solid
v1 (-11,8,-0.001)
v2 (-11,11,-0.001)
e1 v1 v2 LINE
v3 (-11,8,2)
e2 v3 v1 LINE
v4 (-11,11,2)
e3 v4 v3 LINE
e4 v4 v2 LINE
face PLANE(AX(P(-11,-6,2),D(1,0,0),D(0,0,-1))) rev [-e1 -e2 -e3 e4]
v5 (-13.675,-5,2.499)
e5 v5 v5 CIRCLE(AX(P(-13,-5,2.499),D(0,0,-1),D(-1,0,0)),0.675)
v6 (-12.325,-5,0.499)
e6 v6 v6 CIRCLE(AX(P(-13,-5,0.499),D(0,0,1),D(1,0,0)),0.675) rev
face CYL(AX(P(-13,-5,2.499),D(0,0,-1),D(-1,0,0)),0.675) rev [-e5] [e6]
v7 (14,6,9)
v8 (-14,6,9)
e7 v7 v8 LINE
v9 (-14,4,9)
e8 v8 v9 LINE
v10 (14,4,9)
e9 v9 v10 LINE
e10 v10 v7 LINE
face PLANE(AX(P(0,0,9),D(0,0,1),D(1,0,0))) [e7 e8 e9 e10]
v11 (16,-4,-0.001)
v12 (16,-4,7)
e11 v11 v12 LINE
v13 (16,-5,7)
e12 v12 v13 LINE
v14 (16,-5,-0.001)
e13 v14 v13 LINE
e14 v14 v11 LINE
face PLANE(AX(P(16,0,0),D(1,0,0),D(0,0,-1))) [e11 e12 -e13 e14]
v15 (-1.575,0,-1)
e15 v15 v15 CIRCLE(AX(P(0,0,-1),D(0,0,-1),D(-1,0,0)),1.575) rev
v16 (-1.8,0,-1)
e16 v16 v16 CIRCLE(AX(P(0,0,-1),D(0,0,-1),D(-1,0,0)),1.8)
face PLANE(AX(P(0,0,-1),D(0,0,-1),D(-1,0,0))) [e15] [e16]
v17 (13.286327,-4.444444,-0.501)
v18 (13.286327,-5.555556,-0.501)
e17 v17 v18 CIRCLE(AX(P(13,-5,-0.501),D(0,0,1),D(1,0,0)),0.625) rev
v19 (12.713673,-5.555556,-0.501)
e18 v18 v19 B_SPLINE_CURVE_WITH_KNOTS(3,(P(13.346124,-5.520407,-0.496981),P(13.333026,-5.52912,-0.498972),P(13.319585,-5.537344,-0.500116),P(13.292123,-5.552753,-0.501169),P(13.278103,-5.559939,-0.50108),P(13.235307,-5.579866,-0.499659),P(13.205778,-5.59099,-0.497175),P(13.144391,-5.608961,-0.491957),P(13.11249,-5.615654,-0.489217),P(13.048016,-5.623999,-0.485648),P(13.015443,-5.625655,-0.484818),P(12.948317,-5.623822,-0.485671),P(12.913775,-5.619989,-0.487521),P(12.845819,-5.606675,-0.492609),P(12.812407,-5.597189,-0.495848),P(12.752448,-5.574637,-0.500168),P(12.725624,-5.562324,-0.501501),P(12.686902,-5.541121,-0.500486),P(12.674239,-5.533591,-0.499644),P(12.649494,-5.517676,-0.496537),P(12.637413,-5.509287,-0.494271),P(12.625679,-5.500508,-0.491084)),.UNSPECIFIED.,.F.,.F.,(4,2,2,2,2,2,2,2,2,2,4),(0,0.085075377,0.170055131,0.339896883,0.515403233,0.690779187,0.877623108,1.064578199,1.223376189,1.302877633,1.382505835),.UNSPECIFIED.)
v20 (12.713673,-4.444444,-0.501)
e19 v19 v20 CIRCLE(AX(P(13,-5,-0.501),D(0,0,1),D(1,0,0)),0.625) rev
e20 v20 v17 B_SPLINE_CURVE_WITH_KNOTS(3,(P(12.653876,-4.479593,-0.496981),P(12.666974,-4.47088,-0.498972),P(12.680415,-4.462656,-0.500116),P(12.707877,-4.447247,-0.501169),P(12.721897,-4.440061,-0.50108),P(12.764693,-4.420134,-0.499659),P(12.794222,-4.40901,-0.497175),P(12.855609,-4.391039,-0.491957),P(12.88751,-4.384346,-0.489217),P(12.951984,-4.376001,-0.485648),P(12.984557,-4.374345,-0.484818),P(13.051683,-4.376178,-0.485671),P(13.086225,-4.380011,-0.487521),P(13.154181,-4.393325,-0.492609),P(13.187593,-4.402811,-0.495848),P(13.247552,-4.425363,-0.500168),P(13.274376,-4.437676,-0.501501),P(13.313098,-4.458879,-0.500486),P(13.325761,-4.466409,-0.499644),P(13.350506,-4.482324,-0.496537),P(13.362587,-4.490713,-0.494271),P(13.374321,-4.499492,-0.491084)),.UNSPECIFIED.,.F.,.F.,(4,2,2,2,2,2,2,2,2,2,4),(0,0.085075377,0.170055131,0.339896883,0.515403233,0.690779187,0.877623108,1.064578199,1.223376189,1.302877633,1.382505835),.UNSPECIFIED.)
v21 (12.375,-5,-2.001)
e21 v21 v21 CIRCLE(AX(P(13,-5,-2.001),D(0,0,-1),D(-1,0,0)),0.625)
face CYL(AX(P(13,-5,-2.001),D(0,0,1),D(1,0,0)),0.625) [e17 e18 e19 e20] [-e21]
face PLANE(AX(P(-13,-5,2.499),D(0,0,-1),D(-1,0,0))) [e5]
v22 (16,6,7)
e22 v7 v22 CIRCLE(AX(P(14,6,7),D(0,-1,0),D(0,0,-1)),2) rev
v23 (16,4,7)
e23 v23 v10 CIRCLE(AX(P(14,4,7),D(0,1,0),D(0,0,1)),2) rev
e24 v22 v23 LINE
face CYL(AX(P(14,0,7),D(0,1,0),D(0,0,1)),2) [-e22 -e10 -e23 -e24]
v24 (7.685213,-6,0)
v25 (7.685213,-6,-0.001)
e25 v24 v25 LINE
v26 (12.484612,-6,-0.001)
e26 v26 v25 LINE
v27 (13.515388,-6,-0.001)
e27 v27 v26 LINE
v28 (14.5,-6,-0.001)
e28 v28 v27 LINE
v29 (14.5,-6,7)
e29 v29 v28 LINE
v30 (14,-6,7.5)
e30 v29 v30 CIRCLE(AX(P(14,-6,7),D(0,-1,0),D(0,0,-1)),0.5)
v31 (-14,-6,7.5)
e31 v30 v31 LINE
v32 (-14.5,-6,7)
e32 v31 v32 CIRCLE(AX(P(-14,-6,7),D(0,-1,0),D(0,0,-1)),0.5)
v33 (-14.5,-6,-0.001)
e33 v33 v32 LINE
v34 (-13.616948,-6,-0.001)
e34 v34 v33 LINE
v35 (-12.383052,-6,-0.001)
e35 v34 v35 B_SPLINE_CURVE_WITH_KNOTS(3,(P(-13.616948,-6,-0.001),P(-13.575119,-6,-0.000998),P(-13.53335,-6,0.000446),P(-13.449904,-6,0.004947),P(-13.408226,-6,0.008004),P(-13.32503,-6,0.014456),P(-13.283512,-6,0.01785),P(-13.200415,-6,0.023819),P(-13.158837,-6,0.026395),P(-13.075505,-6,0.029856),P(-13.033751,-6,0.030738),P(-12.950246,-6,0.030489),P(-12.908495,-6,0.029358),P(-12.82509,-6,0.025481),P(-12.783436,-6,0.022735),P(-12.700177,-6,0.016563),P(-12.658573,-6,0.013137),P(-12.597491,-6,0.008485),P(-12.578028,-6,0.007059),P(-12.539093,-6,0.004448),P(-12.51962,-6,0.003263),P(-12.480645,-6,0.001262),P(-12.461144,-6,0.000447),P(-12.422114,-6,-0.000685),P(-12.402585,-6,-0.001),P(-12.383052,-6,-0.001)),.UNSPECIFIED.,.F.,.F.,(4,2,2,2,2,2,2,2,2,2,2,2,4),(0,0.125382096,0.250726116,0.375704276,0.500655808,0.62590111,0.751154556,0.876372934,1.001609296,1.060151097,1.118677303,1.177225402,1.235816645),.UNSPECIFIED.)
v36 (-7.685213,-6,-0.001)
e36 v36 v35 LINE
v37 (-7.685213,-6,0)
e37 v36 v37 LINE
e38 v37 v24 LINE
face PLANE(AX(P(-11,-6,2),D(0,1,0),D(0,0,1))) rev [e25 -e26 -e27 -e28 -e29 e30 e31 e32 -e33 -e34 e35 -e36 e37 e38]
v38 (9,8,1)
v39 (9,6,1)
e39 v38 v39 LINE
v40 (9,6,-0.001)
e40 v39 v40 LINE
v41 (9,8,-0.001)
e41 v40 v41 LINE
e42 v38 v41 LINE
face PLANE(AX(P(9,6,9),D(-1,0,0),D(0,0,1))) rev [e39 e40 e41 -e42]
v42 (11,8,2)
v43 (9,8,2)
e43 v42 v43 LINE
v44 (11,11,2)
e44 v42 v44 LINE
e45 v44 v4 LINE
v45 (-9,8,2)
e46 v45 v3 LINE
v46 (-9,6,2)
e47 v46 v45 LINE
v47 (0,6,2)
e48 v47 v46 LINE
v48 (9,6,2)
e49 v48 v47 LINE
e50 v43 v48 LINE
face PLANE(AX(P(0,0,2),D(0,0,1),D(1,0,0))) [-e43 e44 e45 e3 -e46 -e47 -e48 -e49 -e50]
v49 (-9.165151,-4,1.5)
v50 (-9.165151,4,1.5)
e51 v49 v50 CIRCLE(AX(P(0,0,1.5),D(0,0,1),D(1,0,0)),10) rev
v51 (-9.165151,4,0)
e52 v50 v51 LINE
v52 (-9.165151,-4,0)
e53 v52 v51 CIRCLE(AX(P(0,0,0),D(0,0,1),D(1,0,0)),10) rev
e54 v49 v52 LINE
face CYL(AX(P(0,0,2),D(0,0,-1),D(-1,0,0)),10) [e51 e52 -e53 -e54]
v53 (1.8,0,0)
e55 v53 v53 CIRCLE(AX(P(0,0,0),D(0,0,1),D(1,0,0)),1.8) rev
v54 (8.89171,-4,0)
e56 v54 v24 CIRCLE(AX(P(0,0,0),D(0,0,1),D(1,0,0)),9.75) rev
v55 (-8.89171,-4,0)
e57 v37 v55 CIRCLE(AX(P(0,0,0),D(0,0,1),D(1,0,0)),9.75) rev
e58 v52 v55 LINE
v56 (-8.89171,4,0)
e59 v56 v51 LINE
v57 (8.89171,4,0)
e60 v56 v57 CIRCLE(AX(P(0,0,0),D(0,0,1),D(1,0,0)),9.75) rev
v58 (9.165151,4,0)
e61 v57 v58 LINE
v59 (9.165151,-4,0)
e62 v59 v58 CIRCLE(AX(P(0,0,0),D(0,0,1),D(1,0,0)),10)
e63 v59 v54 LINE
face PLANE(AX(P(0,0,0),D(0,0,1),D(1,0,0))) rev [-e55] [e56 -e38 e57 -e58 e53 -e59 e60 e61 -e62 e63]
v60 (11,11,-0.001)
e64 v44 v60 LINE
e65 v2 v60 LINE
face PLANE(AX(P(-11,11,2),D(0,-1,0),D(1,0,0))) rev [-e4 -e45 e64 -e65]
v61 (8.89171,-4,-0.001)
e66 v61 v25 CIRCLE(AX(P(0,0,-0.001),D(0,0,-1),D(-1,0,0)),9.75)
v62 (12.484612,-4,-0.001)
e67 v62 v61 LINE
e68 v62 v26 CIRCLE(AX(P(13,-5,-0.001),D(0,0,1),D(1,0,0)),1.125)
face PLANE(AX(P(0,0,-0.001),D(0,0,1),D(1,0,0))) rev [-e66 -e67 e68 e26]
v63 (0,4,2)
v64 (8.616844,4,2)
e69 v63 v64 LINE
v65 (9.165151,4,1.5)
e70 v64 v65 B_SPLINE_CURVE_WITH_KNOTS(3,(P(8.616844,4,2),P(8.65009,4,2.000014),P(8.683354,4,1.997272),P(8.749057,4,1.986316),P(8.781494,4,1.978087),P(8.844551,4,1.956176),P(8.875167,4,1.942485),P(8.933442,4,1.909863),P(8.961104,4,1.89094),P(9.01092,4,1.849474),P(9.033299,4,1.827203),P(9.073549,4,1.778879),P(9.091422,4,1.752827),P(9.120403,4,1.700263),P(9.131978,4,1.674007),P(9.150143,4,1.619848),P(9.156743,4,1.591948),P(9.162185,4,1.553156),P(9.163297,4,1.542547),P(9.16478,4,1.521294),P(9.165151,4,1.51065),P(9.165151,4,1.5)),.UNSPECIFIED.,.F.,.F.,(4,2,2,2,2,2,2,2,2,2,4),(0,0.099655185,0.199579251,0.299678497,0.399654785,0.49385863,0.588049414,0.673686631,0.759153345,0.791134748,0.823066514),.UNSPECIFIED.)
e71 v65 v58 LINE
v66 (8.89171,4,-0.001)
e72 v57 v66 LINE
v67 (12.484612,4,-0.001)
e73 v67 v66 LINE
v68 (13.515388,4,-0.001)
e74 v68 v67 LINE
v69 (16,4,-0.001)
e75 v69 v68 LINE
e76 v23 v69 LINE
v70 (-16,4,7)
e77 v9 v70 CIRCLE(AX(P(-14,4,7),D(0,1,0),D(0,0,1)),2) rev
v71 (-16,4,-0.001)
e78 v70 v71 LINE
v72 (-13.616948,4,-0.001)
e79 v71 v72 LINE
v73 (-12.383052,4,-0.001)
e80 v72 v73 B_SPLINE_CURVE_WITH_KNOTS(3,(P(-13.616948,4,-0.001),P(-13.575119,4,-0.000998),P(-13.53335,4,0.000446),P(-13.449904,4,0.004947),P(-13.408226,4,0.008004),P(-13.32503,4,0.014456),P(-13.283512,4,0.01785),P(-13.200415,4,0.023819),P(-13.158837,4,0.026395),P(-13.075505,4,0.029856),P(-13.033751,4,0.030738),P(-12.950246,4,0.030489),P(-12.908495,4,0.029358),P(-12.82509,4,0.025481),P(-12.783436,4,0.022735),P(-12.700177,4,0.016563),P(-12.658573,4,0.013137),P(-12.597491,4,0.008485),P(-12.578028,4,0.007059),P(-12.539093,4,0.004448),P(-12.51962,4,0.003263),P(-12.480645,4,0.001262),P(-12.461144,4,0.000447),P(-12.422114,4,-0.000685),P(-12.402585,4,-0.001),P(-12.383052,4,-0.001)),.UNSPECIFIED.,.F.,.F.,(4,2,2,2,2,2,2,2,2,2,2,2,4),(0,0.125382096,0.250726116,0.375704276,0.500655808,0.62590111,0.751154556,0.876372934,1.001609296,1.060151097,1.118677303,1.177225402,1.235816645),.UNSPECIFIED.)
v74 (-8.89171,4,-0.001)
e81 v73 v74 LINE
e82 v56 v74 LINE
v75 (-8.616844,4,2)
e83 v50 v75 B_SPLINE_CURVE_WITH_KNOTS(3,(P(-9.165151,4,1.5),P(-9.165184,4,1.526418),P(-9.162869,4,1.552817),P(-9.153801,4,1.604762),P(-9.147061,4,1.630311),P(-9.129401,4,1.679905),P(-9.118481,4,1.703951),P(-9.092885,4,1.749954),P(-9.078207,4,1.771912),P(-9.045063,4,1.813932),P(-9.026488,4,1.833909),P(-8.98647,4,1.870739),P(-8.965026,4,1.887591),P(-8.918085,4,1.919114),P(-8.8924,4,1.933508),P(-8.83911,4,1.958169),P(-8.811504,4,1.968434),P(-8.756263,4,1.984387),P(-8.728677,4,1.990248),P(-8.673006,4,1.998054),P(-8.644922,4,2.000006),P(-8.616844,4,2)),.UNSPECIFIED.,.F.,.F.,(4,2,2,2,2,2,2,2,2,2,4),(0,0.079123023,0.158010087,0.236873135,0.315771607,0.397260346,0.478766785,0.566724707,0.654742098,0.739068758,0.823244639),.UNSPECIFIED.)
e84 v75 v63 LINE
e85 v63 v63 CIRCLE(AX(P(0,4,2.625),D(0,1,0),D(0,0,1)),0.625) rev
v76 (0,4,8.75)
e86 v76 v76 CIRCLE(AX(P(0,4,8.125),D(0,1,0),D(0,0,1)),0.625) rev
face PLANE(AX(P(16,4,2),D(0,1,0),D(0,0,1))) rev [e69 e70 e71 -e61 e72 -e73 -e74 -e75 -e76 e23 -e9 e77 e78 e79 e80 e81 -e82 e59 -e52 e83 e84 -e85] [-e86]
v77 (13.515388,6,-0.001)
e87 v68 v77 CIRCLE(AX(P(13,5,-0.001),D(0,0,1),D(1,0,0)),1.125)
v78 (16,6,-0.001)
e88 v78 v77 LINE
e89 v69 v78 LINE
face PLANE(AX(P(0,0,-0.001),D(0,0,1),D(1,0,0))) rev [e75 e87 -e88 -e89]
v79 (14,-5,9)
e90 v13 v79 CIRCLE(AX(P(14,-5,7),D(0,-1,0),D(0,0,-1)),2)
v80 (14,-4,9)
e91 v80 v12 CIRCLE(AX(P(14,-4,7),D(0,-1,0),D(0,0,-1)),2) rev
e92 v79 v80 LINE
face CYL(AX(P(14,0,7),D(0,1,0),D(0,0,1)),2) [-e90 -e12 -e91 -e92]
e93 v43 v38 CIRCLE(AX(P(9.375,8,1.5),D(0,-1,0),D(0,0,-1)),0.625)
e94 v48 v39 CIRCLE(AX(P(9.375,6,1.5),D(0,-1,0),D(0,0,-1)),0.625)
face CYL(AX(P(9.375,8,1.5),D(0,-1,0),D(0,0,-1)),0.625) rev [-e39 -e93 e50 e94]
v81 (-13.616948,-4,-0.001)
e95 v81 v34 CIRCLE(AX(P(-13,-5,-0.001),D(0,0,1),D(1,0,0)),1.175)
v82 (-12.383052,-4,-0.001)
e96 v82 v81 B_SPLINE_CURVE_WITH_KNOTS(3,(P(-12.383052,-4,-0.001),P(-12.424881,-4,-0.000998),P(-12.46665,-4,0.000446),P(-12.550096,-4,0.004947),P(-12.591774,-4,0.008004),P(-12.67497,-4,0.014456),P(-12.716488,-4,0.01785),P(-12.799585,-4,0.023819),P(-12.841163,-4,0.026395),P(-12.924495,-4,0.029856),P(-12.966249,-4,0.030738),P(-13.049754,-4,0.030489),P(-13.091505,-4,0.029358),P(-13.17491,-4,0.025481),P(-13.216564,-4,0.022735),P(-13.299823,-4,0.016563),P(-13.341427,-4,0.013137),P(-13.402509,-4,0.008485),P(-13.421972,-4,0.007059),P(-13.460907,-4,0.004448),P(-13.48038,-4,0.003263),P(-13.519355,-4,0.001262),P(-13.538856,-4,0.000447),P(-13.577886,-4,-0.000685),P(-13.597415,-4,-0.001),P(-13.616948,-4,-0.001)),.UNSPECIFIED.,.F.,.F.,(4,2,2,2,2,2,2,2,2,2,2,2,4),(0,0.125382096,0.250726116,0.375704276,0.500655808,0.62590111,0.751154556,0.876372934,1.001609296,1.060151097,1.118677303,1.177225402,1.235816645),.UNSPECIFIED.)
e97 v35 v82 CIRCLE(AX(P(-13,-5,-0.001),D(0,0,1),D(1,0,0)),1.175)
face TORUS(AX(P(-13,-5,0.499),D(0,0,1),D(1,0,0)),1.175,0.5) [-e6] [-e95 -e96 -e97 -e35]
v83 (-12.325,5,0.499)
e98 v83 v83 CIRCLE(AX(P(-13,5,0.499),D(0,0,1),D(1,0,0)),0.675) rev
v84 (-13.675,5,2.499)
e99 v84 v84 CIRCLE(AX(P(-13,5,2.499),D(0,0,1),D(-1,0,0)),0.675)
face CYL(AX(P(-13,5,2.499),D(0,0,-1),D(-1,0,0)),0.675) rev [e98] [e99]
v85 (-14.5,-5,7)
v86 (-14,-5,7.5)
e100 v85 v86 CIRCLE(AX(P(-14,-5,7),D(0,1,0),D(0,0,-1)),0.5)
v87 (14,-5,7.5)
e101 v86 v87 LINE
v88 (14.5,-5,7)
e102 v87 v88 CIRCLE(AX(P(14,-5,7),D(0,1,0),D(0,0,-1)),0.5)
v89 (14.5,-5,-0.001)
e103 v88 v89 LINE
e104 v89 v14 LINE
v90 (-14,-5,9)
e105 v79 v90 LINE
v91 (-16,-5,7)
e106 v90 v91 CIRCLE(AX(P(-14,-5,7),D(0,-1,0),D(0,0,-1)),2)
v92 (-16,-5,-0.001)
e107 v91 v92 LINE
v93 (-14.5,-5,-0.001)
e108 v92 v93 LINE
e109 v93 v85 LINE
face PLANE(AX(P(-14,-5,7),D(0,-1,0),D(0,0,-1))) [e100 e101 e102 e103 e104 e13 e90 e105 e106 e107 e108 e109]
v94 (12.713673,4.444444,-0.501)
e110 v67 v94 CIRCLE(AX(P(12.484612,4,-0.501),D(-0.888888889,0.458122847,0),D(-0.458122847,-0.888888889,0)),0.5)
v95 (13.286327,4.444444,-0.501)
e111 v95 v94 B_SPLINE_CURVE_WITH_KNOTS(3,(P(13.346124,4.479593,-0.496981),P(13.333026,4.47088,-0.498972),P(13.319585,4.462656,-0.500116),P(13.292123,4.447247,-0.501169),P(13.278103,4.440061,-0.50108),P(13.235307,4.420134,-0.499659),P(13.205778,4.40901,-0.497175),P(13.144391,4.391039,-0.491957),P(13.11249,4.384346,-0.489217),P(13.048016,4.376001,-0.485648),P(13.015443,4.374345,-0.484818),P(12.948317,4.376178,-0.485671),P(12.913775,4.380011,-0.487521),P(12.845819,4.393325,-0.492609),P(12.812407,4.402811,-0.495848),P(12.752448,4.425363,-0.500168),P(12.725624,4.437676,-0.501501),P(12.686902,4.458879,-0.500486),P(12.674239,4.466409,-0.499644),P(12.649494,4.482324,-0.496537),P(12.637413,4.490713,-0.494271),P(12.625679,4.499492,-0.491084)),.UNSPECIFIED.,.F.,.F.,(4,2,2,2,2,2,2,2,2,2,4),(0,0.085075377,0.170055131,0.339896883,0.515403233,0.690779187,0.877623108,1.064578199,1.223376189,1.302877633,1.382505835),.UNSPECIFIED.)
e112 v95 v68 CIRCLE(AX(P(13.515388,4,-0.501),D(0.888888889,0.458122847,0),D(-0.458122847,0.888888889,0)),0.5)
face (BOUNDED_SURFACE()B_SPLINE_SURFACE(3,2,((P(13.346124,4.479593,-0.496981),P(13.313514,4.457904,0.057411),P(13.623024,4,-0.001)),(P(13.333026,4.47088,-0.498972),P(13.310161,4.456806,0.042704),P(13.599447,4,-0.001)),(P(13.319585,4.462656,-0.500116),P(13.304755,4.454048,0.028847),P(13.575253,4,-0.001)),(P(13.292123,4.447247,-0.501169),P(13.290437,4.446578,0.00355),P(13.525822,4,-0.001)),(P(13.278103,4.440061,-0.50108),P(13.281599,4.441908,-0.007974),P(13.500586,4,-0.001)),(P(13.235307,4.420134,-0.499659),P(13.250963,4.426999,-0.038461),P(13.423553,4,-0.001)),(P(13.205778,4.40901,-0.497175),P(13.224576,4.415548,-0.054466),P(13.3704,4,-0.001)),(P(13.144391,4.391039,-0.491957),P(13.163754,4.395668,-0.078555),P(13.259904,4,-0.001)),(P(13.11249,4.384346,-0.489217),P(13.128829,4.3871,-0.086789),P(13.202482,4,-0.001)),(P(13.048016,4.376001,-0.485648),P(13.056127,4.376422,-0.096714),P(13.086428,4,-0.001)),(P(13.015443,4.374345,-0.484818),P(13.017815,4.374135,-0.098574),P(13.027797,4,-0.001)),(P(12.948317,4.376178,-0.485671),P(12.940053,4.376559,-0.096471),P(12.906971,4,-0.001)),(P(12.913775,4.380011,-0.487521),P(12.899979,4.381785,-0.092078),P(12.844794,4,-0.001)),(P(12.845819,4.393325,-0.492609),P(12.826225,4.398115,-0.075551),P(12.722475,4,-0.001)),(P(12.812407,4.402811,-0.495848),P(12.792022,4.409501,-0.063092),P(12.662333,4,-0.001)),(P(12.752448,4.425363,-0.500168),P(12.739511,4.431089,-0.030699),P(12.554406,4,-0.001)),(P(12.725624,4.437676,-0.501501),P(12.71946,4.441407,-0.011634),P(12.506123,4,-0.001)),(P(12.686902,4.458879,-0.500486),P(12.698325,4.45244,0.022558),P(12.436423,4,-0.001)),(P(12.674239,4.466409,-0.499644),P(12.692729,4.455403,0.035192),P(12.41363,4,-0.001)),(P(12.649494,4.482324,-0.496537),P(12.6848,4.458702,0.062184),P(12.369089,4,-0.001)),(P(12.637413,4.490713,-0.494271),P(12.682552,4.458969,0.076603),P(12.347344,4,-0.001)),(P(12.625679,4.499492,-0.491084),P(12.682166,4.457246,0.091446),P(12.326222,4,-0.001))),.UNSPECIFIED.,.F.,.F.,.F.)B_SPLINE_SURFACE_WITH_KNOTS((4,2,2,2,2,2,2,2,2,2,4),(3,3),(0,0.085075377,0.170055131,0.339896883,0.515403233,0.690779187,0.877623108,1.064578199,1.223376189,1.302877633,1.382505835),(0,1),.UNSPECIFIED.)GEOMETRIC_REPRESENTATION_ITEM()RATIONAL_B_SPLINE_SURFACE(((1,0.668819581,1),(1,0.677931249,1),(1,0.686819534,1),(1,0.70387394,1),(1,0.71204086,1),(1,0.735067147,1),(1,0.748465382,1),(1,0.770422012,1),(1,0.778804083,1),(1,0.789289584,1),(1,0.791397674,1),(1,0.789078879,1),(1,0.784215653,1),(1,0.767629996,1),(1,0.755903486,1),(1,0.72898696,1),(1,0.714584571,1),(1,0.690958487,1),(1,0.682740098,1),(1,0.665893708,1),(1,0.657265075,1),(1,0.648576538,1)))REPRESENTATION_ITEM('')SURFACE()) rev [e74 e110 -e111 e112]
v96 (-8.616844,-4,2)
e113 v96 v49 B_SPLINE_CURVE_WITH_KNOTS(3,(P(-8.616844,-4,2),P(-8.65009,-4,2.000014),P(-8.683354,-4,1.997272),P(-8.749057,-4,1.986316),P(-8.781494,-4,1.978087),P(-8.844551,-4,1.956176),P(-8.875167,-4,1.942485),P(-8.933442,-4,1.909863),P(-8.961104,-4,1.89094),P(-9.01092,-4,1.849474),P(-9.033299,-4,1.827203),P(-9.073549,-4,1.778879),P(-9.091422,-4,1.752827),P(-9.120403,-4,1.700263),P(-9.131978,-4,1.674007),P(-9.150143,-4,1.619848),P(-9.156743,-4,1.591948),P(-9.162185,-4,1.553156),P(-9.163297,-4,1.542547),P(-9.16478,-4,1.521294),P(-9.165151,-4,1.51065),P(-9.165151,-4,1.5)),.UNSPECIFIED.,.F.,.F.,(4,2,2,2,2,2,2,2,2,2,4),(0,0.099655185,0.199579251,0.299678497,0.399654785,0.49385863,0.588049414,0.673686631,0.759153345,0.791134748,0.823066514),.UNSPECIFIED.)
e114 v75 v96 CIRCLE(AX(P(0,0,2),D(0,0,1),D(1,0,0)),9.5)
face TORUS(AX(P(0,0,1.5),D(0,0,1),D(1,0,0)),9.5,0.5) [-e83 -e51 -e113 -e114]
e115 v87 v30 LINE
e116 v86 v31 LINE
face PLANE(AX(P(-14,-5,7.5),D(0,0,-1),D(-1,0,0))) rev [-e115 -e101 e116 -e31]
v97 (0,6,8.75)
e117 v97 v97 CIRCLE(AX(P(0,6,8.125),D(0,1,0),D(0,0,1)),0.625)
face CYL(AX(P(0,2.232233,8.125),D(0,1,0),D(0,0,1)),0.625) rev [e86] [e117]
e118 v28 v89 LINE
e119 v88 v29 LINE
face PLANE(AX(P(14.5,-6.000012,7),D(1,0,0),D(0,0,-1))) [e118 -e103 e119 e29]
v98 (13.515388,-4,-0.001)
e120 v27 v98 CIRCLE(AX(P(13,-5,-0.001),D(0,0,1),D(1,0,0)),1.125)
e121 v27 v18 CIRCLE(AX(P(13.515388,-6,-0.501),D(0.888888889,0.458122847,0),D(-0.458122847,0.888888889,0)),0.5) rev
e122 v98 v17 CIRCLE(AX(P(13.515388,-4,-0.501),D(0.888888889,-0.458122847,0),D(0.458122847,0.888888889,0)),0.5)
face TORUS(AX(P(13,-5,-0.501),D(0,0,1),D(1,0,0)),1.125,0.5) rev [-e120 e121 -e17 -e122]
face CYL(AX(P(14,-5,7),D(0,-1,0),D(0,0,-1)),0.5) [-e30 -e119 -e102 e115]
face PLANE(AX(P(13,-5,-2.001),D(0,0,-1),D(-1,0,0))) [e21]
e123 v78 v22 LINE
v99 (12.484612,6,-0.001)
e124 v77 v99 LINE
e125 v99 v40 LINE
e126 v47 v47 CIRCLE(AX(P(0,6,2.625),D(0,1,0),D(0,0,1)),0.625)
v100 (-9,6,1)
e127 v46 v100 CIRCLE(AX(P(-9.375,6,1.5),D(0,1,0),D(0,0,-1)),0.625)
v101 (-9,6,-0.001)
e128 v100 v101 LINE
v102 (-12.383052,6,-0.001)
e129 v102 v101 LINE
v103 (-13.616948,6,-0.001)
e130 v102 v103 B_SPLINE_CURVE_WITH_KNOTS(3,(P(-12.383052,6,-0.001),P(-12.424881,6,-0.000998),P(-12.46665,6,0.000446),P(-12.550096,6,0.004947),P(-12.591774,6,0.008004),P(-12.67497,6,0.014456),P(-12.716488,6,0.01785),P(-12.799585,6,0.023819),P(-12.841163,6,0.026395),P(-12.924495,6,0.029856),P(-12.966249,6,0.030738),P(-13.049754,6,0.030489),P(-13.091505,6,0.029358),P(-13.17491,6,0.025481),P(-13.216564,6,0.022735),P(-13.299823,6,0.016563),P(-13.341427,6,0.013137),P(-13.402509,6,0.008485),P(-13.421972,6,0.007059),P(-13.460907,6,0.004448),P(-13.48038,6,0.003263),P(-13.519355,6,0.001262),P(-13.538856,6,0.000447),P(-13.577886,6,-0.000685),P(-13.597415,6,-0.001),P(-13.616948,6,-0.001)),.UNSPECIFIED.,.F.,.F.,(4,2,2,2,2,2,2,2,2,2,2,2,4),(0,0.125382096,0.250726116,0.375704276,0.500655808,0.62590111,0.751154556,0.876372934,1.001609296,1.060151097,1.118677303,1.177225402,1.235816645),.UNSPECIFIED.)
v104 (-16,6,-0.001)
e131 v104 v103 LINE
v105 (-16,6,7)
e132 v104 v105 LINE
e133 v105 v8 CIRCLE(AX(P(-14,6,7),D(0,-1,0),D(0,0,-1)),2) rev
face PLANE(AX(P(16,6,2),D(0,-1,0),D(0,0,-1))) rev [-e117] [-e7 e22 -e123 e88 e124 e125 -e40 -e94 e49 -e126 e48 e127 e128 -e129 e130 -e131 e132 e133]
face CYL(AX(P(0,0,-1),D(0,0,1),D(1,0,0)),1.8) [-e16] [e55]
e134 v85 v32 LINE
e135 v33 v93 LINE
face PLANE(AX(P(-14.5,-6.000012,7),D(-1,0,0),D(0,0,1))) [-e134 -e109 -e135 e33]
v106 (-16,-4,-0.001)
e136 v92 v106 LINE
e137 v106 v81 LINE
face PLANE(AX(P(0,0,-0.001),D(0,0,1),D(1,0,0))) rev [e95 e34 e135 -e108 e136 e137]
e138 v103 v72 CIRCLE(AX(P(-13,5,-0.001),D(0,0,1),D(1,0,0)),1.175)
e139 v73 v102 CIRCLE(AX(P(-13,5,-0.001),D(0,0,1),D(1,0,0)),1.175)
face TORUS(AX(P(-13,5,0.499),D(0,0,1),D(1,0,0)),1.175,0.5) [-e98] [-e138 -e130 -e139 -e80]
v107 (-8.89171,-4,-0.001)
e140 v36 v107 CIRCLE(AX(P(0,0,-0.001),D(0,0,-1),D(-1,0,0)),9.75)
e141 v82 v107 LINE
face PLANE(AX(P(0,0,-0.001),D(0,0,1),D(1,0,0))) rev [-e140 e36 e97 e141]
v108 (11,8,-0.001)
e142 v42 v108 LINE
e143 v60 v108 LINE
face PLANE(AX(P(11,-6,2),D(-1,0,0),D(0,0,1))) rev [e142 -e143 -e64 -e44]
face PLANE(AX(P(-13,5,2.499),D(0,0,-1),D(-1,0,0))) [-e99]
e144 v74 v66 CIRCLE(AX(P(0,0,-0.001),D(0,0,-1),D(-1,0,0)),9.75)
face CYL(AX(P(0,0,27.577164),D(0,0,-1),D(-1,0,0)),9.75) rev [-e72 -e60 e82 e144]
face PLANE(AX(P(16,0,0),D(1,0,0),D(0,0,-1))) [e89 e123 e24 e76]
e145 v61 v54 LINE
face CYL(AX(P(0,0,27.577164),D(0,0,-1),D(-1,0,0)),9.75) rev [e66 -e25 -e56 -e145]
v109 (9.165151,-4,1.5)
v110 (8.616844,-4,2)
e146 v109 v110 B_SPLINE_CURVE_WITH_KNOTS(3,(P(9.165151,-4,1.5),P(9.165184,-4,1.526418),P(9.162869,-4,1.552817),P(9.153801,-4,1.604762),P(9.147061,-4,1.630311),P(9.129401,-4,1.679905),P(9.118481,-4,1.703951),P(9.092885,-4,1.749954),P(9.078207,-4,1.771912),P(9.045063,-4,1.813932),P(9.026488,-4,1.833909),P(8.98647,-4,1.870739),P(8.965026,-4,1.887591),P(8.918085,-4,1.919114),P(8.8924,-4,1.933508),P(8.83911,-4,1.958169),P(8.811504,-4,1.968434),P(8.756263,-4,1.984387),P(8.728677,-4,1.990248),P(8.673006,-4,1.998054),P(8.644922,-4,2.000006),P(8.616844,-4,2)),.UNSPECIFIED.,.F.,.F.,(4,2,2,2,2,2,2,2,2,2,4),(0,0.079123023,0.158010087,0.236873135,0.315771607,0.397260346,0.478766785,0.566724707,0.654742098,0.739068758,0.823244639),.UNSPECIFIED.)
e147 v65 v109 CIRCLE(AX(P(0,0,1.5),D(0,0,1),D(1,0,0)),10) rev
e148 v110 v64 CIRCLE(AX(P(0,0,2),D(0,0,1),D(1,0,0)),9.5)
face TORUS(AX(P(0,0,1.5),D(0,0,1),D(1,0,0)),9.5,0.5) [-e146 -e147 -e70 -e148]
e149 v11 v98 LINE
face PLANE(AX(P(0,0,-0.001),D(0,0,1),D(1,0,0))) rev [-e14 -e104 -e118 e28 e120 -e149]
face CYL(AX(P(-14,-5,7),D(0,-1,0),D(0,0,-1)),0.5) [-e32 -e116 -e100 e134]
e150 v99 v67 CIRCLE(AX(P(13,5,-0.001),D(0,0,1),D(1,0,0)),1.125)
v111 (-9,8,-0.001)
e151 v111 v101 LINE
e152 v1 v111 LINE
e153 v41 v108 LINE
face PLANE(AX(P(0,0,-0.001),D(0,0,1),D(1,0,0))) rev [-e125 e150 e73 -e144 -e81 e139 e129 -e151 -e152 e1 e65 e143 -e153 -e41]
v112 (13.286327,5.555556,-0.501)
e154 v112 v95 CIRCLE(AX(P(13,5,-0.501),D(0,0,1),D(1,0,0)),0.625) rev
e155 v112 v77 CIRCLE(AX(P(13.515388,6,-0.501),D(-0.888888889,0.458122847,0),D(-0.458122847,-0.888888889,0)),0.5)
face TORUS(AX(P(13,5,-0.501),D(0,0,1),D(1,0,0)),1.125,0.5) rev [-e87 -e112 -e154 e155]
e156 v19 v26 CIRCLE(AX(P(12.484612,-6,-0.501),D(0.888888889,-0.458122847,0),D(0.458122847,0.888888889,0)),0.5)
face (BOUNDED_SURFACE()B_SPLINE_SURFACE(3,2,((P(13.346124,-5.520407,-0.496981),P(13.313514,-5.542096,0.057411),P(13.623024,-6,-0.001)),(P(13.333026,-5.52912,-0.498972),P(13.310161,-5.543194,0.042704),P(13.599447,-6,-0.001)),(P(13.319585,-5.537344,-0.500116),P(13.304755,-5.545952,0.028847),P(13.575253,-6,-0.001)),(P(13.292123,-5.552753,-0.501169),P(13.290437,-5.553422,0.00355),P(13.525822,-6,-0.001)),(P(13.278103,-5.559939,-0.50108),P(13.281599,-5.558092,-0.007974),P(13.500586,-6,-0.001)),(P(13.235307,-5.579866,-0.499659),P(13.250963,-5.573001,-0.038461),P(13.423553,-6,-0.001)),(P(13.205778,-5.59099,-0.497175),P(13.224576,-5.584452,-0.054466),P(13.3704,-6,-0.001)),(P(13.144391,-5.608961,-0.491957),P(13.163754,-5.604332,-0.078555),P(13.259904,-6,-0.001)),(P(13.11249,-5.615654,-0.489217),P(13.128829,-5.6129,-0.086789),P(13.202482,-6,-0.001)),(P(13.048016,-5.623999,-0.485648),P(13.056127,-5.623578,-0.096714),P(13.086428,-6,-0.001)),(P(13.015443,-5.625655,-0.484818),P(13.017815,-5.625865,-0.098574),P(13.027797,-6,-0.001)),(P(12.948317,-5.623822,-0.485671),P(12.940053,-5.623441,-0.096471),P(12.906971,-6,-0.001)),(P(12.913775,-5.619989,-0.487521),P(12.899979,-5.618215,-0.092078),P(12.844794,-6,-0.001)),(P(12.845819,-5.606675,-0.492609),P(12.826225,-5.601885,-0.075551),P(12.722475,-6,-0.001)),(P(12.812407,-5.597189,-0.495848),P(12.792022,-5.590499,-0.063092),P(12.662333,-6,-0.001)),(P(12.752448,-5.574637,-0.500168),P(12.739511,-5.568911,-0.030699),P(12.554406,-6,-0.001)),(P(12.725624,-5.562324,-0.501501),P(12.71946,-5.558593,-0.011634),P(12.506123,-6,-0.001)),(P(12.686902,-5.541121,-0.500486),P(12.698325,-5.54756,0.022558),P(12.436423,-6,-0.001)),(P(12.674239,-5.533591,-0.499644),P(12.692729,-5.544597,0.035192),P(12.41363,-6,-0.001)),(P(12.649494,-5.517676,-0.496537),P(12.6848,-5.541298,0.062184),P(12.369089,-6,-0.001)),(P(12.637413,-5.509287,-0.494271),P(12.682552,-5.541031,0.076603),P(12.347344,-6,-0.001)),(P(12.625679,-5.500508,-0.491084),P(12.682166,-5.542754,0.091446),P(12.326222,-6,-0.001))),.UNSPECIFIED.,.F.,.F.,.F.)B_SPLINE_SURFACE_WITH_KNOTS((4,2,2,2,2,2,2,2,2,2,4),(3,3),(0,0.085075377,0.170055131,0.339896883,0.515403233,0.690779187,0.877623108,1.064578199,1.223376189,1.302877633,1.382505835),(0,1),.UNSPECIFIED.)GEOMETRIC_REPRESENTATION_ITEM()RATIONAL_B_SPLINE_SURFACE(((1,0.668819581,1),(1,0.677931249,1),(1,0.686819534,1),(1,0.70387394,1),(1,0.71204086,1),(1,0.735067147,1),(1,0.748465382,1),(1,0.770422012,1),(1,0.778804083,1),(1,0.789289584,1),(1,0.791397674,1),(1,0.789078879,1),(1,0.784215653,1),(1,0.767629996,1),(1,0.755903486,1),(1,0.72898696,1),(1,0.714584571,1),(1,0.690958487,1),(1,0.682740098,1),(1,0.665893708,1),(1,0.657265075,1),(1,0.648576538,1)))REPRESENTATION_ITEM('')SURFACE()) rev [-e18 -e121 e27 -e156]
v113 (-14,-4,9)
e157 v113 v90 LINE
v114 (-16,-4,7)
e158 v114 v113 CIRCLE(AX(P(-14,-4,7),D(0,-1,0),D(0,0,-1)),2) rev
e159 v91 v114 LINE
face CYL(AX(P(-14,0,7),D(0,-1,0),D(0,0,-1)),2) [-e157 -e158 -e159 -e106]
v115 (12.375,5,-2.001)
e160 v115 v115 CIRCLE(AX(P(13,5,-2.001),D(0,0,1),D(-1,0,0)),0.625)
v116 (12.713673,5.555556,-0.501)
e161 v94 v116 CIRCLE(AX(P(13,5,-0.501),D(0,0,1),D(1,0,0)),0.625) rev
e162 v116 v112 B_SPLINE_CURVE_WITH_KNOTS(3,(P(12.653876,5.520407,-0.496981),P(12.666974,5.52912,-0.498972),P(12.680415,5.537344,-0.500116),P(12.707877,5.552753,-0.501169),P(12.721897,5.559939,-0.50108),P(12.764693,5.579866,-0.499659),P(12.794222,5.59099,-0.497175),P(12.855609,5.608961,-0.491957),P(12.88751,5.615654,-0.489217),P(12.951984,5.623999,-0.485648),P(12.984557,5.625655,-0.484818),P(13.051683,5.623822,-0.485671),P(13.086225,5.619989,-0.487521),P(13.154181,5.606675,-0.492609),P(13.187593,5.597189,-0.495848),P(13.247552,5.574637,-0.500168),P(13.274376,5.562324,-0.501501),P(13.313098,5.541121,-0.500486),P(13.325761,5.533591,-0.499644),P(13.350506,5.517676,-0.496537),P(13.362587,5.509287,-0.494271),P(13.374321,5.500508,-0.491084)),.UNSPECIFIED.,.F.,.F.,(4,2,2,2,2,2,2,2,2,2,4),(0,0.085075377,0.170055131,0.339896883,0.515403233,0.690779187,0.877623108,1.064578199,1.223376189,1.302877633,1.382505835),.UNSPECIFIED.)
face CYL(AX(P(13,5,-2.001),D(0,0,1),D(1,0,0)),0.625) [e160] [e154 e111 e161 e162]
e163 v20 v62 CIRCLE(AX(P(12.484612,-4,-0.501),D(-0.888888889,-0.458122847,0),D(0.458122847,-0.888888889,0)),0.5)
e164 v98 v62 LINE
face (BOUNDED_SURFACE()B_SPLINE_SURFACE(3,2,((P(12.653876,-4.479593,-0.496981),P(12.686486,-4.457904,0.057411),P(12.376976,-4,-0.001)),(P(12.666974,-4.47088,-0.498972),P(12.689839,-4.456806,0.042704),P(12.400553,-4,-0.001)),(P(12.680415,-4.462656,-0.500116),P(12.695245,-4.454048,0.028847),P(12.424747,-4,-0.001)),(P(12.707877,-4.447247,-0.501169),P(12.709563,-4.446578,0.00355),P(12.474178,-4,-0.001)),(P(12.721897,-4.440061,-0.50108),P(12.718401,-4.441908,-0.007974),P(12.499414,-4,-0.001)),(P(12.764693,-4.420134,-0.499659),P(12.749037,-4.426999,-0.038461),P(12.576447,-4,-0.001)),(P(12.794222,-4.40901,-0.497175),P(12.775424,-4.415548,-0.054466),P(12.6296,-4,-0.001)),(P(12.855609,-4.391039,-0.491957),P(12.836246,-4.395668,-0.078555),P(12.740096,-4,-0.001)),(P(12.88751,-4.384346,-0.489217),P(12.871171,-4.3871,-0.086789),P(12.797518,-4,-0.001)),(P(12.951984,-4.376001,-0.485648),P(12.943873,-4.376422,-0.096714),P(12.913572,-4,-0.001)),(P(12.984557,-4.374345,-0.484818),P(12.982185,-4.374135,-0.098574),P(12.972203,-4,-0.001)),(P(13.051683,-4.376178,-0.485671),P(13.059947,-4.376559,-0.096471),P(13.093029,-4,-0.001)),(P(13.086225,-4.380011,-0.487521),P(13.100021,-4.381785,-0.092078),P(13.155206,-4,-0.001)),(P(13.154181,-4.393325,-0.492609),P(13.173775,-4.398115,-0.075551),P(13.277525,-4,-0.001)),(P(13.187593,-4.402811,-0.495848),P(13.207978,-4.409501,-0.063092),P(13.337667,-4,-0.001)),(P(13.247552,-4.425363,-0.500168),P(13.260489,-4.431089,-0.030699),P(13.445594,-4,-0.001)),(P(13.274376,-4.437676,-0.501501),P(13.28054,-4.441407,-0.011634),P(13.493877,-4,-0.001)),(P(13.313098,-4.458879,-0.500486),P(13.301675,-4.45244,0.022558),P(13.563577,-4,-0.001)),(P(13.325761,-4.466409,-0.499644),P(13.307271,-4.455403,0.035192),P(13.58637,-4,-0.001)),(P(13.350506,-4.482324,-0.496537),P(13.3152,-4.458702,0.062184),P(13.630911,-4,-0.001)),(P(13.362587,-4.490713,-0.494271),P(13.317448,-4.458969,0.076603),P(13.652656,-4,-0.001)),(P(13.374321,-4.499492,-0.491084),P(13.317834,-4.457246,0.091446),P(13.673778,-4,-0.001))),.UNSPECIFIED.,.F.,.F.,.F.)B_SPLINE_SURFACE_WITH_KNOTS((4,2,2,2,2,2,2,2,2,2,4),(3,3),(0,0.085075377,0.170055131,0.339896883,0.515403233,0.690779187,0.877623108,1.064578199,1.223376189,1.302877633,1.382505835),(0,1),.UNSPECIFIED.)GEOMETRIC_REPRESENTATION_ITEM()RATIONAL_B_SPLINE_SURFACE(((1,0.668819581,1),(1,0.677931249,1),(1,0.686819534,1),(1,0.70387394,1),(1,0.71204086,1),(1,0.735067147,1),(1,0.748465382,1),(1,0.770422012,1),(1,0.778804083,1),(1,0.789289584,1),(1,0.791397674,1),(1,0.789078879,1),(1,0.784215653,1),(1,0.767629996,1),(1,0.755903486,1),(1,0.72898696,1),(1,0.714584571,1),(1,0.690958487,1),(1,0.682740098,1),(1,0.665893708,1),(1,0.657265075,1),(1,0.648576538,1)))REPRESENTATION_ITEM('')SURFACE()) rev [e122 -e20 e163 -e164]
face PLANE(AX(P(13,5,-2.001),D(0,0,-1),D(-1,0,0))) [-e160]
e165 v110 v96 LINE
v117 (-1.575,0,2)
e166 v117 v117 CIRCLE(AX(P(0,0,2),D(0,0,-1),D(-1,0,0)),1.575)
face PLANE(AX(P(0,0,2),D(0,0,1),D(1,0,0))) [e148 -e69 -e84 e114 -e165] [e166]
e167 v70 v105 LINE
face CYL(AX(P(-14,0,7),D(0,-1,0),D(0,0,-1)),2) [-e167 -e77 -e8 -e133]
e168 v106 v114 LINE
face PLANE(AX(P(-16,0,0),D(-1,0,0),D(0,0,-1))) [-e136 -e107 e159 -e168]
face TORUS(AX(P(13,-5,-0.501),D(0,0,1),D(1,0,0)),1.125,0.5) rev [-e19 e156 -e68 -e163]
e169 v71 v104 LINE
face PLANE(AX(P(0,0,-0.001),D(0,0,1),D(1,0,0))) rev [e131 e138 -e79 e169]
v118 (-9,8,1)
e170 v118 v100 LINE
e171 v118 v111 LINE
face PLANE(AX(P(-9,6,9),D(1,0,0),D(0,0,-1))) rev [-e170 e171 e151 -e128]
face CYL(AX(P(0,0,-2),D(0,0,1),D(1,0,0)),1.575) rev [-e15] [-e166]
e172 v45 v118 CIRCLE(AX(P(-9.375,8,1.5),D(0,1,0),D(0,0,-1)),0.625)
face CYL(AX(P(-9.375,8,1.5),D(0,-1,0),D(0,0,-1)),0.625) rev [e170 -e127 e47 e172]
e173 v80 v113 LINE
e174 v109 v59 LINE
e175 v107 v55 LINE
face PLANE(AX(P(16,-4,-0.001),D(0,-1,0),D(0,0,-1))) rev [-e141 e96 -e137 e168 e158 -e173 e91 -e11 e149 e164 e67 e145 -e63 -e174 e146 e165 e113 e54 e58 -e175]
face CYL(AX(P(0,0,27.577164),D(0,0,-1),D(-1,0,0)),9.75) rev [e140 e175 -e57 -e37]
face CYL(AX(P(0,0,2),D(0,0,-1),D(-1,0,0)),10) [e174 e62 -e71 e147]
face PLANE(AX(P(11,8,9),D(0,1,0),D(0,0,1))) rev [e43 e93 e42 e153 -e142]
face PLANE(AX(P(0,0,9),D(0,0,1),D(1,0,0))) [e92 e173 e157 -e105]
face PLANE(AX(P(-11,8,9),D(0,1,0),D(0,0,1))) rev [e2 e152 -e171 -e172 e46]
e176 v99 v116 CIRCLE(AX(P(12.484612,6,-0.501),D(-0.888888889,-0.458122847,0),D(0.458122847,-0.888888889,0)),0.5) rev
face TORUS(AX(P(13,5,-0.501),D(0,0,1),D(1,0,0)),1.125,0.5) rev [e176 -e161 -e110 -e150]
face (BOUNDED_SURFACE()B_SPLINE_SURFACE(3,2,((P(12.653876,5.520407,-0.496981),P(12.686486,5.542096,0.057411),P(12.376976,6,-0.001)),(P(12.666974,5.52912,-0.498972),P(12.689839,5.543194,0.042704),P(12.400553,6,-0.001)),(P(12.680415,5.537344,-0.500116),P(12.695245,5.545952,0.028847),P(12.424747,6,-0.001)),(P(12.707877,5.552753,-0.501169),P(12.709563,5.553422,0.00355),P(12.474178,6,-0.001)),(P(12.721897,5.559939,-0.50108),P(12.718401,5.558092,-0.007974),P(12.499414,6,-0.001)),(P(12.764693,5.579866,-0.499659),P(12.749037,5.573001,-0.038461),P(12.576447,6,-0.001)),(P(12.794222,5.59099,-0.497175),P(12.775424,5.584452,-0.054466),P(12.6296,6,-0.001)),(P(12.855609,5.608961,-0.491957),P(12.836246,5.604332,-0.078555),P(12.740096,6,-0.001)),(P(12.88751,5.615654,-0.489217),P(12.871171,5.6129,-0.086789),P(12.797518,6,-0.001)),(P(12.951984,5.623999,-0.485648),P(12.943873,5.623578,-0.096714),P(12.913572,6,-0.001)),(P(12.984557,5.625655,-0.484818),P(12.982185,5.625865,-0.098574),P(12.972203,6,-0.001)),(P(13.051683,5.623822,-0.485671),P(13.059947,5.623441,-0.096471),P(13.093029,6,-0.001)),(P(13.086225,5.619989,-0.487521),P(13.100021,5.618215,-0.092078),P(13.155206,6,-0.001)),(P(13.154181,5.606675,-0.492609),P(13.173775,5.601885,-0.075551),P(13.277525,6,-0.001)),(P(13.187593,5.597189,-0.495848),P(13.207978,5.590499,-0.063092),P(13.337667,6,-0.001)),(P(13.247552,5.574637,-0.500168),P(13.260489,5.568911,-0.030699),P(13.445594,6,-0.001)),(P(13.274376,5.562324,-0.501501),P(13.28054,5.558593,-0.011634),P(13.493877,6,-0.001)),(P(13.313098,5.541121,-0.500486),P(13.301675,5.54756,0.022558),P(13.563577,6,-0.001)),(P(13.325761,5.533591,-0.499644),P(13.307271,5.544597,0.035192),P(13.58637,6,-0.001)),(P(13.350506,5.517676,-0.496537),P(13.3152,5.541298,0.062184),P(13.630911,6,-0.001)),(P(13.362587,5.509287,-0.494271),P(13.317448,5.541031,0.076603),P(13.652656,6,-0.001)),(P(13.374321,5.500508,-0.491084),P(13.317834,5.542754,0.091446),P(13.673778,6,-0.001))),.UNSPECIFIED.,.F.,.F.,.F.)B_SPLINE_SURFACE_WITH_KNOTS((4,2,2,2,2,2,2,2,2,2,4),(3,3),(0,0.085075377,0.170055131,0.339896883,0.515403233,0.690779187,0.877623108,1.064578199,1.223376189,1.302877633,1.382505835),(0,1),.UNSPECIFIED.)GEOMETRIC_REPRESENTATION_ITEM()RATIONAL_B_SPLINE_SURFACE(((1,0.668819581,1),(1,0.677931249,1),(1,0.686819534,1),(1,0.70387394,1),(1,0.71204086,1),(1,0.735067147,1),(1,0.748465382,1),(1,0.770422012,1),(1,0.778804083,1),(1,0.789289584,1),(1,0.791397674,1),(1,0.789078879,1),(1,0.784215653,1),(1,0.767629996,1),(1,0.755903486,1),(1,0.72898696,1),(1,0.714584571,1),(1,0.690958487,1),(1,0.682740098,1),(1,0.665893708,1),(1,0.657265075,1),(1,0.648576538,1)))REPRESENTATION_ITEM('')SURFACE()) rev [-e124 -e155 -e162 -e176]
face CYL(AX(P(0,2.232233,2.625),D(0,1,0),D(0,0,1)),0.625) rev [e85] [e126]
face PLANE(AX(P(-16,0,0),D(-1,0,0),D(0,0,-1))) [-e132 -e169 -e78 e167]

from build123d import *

# Parameters (mm, degrees)
BOSS_EXTRUDE1_DEPTH     = 2
SKETCH2_R               = 1.575
BOSS_EXTRUDE2_DEPTH     = 4
SKETCH3_R               = 1.8
BOSS_EXTRUDE3_DEPTH     = 1
SKETCH4_W               = 2
SKETCH4_H               = 17
BOSS_EXTRUDE4_DEPTH     = 0.001
SKETCH5_W               = 18
SKETCH5_H               = 2
BOSS_EXTRUDE5_DEPTH     = 0.001
SKETCH6_W               = 2.001
SKETCH6_H               = 2
BOSS_EXTRUDE6_DEPTH     = 5
BOSS_EXTRUDE7_DEPTH     = 0.001
CUT_EXTRUDE1_DEPTH      = 20.519323784
SKETCH9_W               = 2.937742252
SKETCH9_H               = 8
CUT_EXTRUDE2_DEPTH      = 0.001
CUT_EXTRUDE11_START     = -0.001
SKETCH21_R              = 9.75
SKETCH21_R_2            = 1.8
CUT_EXTRUDE11_DEPTH     = 0.001
SKETCH10_W              = 32
SKETCH10_H              = 2
BOSS_EXTRUDE8_DEPTH     = 7
FILLET1_R               = 0.5
SKETCH11_R              = 0.625
BOSS_EXTRUDE9_DEPTH     = 2
SKETCH14_W              = 2
SKETCH14_H              = 2
CUT_EXTRUDE5_DEPTH      = 22.401355237
SKETCH12_R              = 0.675
CUT_EXTRUDE3_DEPTH      = 2.5
CUT_EXTRUDE6_DEPTH      = 2
FILLET2_R               = 0.5
FILLET3_R               = 0.5
FILLET4_R               = 2
CUT_EXTRUDE7_DEPTH      = 26.019992106
CUT_EXTRUDE7_DEPTH_BACK = 1
SKETCH19_R              = 0.625
CUT_EXTRUDE9_DEPTH      = 2


with BuildPart() as part:
    # Sketch1 → Boss-Extrude1 (new body)
    with BuildSketch(Plane.XY):
        Polygon((-11, 6), (-11, 11), (11, 11), (11, 6), (11, -6), (-11, -6), align=None)
    extrude(amount=BOSS_EXTRUDE1_DEPTH)

    # Sketch3 → Boss-Extrude3 (add)
    with BuildSketch(Plane(origin=(0, 0, 0), x_dir=(-1, 0, 0), z_dir=(0, 0, -1))):
        with Locations(Location((0, 0, 0), (0, 0, 180))):
            Circle(SKETCH3_R)
    extrude(amount=BOSS_EXTRUDE3_DEPTH)

    # Sketch4 → Boss-Extrude4 (add)
    with BuildSketch(Plane(origin=(0, 0, 0), x_dir=(-1, 0, 0), z_dir=(0, 0, -1))):
        with Locations((10, 2.5)):
            Rectangle(SKETCH4_W, SKETCH4_H)
        with Locations((-10, 2.5)):
            Rectangle(SKETCH4_W, SKETCH4_H)
    extrude(amount=BOSS_EXTRUDE4_DEPTH)

    # Sketch5 → Boss-Extrude5 (add)
    with BuildSketch(Plane(origin=(0, 0, 0), x_dir=(-1, 0, 0), z_dir=(0, 0, -1))):
        with Locations((0, 10)):
            Rectangle(SKETCH5_W, SKETCH5_H)
    extrude(amount=BOSS_EXTRUDE5_DEPTH)

    # Sketch6 → Boss-Extrude6 (add)
    with BuildSketch(Plane(origin=(11, 0, 0), x_dir=(0, 0, -1), z_dir=(1, 0, 0))):
        with Locations((-0.9995, -5)):
            Rectangle(SKETCH6_W, SKETCH6_H)
        with Locations((-0.9995, 5)):
            Rectangle(SKETCH6_W, SKETCH6_H)
    boss_extrude6 = extrude(amount=BOSS_EXTRUDE6_DEPTH)

    # Mirror1: Boss-Extrude6 across plane
    add(boss_extrude6.mirror(Plane(origin=(0, 0, 0), x_dir=(0, 0, 1), z_dir=(1, 0, 0))))

    # Sketch7 → Boss-Extrude7 (add)
    with BuildSketch(Plane(origin=(0, 0, -0.001), x_dir=(-1, 0, 0), z_dir=(0, 0, -1))):
        with BuildLine():
            ThreePointArc((-6.708203932, -6), (-8.407551231, -3.211398808), (-9, 0))
            Line((-9, 0), (-9, -6))
            Line((-9, -6), (-6.708203932, -6))
        make_face()
        with BuildLine():
            Line((-9, 9), (-9, 0))
            ThreePointArc((-9, 0), (-6.363961031, 6.363961031), (0, 9))
            Line((0, 9), (-9, 9))
        make_face()
    boss_extrude7 = extrude(amount=-BOSS_EXTRUDE7_DEPTH)

    # Sketch8 → Cut-Extrude1 (cut, through all)
    with BuildSketch(Plane(origin=(0, 0, -0.001), x_dir=(-1, 0, 0), z_dir=(0, 0, -1))):
        with BuildLine():
            Line((-11, 4), (-9.16515139, 4))
            ThreePointArc((-9.16515139, 4), (-10, 0), (-9.16515139, -4))
            Line((-9.16515139, -4), (-11, -4))
            Line((-11, -4), (-11, 4))
        make_face()
    cut_extrude1 = extrude(amount=-CUT_EXTRUDE1_DEPTH, mode=Mode.SUBTRACT)

    # Sketch9 → Cut-Extrude2 (cut)
    with BuildSketch(Plane(origin=(0, 0, -0.001), x_dir=(-1, 0, 0), z_dir=(0, 0, -1))):
        with Locations((-9.531128874, 0)):
            Rectangle(SKETCH9_W, SKETCH9_H)
    cut_extrude2 = extrude(amount=-CUT_EXTRUDE2_DEPTH, mode=Mode.SUBTRACT)

    # Mirror2: Boss-Extrude7, Cut-Extrude1, Cut-Extrude2 across plane
    add(boss_extrude7.mirror(Plane(origin=(0, 0, 0), x_dir=(0, 0, 1), z_dir=(1, 0, 0))))
    add(cut_extrude1.mirror(Plane(origin=(0, 0, 0), x_dir=(0, 0, 1), z_dir=(1, 0, 0))), mode=Mode.SUBTRACT)
    add(cut_extrude2.mirror(Plane(origin=(0, 0, 0), x_dir=(0, 0, 1), z_dir=(1, 0, 0))), mode=Mode.SUBTRACT)

    # Sketch21 → Cut-Extrude11 (cut)
    with BuildSketch(Plane(origin=(0, 0, -0.001), x_dir=(-1, 0, 0), z_dir=(0, 0, -1)).offset(CUT_EXTRUDE11_START)):
        Circle(SKETCH21_R)
        with Locations(Location((0, 0, 0), (0, 0, 180))):
            Circle(SKETCH21_R_2, mode=Mode.SUBTRACT)
    extrude(amount=CUT_EXTRUDE11_DEPTH, mode=Mode.SUBTRACT)

    # Sketch10 → Boss-Extrude8 (add)
    with BuildSketch(Plane.XY.offset(2)):
        with Locations((0, -5)):
            Rectangle(SKETCH10_W, SKETCH10_H)
        with Locations((0, 5)):
            Rectangle(SKETCH10_W, SKETCH10_H)
    extrude(amount=BOSS_EXTRUDE8_DEPTH)

    # Fillet1
    fillet1_edges = [part.edges().sort_by_distance(p)[0] for p in [
        (10, 0, 2),
        (-10, 0, 2),
    ]]
    fillet(fillet1_edges, radius=FILLET1_R)

    # Sketch11 → Boss-Extrude9 (add)
    with BuildSketch(Plane(origin=(0, 0, -0.001), x_dir=(-1, 0, 0), z_dir=(0, 0, -1))):
        with Locations(Location((-13, -5, 0), (0, 0, 180))):
            Circle(SKETCH11_R)
    boss_extrude9 = extrude(amount=BOSS_EXTRUDE9_DEPTH)

    # Sketch14 → Cut-Extrude5 (cut, through all)
    with BuildSketch(Plane(origin=(0, 0, -0.001), x_dir=(-1, 0, 0), z_dir=(0, 0, -1))):
        with Locations((10, 7)):
            Rectangle(SKETCH14_W, SKETCH14_H)
        with Locations((-10, 7)):
            Rectangle(SKETCH14_W, SKETCH14_H)
    extrude(amount=-CUT_EXTRUDE5_DEPTH, mode=Mode.SUBTRACT)

    # Sketch12 → Cut-Extrude3 (cut)
    with BuildSketch(Plane(origin=(0, 0, -0.001), x_dir=(-1, 0, 0), z_dir=(0, 0, -1))):
        with Locations((13, -5)):
            Circle(SKETCH12_R)
    cut_extrude3 = extrude(amount=-CUT_EXTRUDE3_DEPTH, mode=Mode.SUBTRACT)

    # Sketch16 → Cut-Extrude6 (cut)
    with BuildSketch(Plane(origin=(0, 6, 0), x_dir=(1, 0, 0), z_dir=(0, 1, 0))):
        with BuildLine():
            Line((-9, -1), (-9, -2))
            ThreePointArc((-9, -2), (-8.75, -1.5), (-9, -1))
        make_face()
    cut_extrude6 = extrude(amount=CUT_EXTRUDE6_DEPTH, mode=Mode.SUBTRACT)

    # Mirror3: Boss-Extrude9, Cut-Extrude3 across plane
    add(boss_extrude9.mirror(Plane.ZX))
    add(cut_extrude3.mirror(Plane.ZX), mode=Mode.SUBTRACT)

    # Mirror4: Cut-Extrude6 across plane
    add(cut_extrude6.mirror(Plane(origin=(0, 0, 0), x_dir=(0, 0, 1), z_dir=(1, 0, 0))), mode=Mode.SUBTRACT)

    # Fillet2
    fillet2_edges = [part.edges().sort_by_distance(p)[0] for p in [
        (12.375, -5, -0.001),
        (12.375, 5, -0.001),
    ]]
    fillet(fillet2_edges, radius=FILLET2_R)

    # Fillet3
    # the kernel refuses this fillet: 0.5 mm, written as the material it takes off along each edge
    with BuildSketch(Plane(origin=(-13, -5, -0.001), x_dir=(-1, 0, 0), z_dir=(0, -1, 0))) as fillet3_piece_1:
        with BuildLine():
            CenterArc((0.675 + FILLET3_R, -FILLET3_R), FILLET3_R, 90, 90)
            Line((0.675, -FILLET3_R), (0.675, 0))
            Line((0.675, 0), (0.675 + FILLET3_R, 0))
        make_face()
    revolve(axis=Axis((-13, -5, -0.001), (0, 0, -1)), mode=Mode.SUBTRACT)
    with BuildSketch(Plane(origin=(-13, 5, -0.001), x_dir=(-1, 0, 0), z_dir=(0, 1, 0))) as fillet3_piece_2:
        with BuildLine():
            CenterArc((0.675 + FILLET3_R, FILLET3_R), FILLET3_R, 180, 90)
            Line((0.675, FILLET3_R), (0.675, 0))
            Line((0.675, 0), (0.675 + FILLET3_R, 0))
        make_face()
    revolve(axis=Axis((-13, 5, -0.001), (0, 0, 1)), mode=Mode.SUBTRACT)

    # Fillet4
    fillet4_edges = [part.edges().sort_by_distance(p)[0] for p in [
        (16, -5, 9),
        (-16, -5, 9),
        (-16, 5, 9),
        (16, 5, 9),
    ]]
    fillet(fillet4_edges, radius=FILLET4_R)

    # Sketch17 → Cut-Extrude7 (cut, two sides: drawn at the far end of the back side and taken through both)
    with BuildSketch(Plane.XZ.offset(6).offset(-CUT_EXTRUDE7_DEPTH_BACK)):
        with BuildLine():
            Line((-16, 7), (-16, -0.001))
            Line((-16, -0.001), (-14.5, -0.001))
            Line((-14.5, -0.001), (-14.5, 7))
            ThreePointArc((-14.5, 7), (-14.353553391, 7.353553391), (-14, 7.5))
            Line((-14, 7.5), (14, 7.5))
            ThreePointArc((14, 7.5), (14.353553391, 7.353553391), (14.5, 7))
            Line((14.5, 7), (14.5, -0.001))
            Line((14.5, -0.001), (16, -0.001))
            Line((16, -0.001), (16, 7))
            ThreePointArc((16, 7), (15.414213562, 8.414213562), (14, 9))
            Line((14, 9), (-14, 9))
            ThreePointArc((-14, 9), (-15.414213562, 8.414213562), (-16, 7))
        make_face()
    extrude(amount=CUT_EXTRUDE7_DEPTH + CUT_EXTRUDE7_DEPTH_BACK, mode=Mode.SUBTRACT)

    # Sketch19 → Cut-Extrude9 (cut)
    with BuildSketch(Plane(origin=(0, 6, 0), x_dir=(1, 0, 0), z_dir=(0, 1, 0))):
        with Locations(Location((0, -2.625, 0), (0, 0, 90))):
            Circle(SKETCH19_R)
        with Locations(Location((0, -8.125, 0), (0, 0, 270))):
            Circle(SKETCH19_R)
    extrude(amount=-CUT_EXTRUDE9_DEPTH, mode=Mode.SUBTRACT)


with BuildPart() as body_2:
    # Sketch2 → Boss-Extrude2 (new body)
    with BuildSketch(Plane(origin=(0, 0, 2), x_dir=(-1, 0, 0), z_dir=(0, 0, -1))):
        Circle(SKETCH2_R)
    extrude(amount=BOSS_EXTRUDE2_DEPTH)


with BuildPart() as part_1:
    add(part.part)

    # Combine2: cut body 2
    add(body_2.part, mode=Mode.SUBTRACT)


solid = part_1.part
